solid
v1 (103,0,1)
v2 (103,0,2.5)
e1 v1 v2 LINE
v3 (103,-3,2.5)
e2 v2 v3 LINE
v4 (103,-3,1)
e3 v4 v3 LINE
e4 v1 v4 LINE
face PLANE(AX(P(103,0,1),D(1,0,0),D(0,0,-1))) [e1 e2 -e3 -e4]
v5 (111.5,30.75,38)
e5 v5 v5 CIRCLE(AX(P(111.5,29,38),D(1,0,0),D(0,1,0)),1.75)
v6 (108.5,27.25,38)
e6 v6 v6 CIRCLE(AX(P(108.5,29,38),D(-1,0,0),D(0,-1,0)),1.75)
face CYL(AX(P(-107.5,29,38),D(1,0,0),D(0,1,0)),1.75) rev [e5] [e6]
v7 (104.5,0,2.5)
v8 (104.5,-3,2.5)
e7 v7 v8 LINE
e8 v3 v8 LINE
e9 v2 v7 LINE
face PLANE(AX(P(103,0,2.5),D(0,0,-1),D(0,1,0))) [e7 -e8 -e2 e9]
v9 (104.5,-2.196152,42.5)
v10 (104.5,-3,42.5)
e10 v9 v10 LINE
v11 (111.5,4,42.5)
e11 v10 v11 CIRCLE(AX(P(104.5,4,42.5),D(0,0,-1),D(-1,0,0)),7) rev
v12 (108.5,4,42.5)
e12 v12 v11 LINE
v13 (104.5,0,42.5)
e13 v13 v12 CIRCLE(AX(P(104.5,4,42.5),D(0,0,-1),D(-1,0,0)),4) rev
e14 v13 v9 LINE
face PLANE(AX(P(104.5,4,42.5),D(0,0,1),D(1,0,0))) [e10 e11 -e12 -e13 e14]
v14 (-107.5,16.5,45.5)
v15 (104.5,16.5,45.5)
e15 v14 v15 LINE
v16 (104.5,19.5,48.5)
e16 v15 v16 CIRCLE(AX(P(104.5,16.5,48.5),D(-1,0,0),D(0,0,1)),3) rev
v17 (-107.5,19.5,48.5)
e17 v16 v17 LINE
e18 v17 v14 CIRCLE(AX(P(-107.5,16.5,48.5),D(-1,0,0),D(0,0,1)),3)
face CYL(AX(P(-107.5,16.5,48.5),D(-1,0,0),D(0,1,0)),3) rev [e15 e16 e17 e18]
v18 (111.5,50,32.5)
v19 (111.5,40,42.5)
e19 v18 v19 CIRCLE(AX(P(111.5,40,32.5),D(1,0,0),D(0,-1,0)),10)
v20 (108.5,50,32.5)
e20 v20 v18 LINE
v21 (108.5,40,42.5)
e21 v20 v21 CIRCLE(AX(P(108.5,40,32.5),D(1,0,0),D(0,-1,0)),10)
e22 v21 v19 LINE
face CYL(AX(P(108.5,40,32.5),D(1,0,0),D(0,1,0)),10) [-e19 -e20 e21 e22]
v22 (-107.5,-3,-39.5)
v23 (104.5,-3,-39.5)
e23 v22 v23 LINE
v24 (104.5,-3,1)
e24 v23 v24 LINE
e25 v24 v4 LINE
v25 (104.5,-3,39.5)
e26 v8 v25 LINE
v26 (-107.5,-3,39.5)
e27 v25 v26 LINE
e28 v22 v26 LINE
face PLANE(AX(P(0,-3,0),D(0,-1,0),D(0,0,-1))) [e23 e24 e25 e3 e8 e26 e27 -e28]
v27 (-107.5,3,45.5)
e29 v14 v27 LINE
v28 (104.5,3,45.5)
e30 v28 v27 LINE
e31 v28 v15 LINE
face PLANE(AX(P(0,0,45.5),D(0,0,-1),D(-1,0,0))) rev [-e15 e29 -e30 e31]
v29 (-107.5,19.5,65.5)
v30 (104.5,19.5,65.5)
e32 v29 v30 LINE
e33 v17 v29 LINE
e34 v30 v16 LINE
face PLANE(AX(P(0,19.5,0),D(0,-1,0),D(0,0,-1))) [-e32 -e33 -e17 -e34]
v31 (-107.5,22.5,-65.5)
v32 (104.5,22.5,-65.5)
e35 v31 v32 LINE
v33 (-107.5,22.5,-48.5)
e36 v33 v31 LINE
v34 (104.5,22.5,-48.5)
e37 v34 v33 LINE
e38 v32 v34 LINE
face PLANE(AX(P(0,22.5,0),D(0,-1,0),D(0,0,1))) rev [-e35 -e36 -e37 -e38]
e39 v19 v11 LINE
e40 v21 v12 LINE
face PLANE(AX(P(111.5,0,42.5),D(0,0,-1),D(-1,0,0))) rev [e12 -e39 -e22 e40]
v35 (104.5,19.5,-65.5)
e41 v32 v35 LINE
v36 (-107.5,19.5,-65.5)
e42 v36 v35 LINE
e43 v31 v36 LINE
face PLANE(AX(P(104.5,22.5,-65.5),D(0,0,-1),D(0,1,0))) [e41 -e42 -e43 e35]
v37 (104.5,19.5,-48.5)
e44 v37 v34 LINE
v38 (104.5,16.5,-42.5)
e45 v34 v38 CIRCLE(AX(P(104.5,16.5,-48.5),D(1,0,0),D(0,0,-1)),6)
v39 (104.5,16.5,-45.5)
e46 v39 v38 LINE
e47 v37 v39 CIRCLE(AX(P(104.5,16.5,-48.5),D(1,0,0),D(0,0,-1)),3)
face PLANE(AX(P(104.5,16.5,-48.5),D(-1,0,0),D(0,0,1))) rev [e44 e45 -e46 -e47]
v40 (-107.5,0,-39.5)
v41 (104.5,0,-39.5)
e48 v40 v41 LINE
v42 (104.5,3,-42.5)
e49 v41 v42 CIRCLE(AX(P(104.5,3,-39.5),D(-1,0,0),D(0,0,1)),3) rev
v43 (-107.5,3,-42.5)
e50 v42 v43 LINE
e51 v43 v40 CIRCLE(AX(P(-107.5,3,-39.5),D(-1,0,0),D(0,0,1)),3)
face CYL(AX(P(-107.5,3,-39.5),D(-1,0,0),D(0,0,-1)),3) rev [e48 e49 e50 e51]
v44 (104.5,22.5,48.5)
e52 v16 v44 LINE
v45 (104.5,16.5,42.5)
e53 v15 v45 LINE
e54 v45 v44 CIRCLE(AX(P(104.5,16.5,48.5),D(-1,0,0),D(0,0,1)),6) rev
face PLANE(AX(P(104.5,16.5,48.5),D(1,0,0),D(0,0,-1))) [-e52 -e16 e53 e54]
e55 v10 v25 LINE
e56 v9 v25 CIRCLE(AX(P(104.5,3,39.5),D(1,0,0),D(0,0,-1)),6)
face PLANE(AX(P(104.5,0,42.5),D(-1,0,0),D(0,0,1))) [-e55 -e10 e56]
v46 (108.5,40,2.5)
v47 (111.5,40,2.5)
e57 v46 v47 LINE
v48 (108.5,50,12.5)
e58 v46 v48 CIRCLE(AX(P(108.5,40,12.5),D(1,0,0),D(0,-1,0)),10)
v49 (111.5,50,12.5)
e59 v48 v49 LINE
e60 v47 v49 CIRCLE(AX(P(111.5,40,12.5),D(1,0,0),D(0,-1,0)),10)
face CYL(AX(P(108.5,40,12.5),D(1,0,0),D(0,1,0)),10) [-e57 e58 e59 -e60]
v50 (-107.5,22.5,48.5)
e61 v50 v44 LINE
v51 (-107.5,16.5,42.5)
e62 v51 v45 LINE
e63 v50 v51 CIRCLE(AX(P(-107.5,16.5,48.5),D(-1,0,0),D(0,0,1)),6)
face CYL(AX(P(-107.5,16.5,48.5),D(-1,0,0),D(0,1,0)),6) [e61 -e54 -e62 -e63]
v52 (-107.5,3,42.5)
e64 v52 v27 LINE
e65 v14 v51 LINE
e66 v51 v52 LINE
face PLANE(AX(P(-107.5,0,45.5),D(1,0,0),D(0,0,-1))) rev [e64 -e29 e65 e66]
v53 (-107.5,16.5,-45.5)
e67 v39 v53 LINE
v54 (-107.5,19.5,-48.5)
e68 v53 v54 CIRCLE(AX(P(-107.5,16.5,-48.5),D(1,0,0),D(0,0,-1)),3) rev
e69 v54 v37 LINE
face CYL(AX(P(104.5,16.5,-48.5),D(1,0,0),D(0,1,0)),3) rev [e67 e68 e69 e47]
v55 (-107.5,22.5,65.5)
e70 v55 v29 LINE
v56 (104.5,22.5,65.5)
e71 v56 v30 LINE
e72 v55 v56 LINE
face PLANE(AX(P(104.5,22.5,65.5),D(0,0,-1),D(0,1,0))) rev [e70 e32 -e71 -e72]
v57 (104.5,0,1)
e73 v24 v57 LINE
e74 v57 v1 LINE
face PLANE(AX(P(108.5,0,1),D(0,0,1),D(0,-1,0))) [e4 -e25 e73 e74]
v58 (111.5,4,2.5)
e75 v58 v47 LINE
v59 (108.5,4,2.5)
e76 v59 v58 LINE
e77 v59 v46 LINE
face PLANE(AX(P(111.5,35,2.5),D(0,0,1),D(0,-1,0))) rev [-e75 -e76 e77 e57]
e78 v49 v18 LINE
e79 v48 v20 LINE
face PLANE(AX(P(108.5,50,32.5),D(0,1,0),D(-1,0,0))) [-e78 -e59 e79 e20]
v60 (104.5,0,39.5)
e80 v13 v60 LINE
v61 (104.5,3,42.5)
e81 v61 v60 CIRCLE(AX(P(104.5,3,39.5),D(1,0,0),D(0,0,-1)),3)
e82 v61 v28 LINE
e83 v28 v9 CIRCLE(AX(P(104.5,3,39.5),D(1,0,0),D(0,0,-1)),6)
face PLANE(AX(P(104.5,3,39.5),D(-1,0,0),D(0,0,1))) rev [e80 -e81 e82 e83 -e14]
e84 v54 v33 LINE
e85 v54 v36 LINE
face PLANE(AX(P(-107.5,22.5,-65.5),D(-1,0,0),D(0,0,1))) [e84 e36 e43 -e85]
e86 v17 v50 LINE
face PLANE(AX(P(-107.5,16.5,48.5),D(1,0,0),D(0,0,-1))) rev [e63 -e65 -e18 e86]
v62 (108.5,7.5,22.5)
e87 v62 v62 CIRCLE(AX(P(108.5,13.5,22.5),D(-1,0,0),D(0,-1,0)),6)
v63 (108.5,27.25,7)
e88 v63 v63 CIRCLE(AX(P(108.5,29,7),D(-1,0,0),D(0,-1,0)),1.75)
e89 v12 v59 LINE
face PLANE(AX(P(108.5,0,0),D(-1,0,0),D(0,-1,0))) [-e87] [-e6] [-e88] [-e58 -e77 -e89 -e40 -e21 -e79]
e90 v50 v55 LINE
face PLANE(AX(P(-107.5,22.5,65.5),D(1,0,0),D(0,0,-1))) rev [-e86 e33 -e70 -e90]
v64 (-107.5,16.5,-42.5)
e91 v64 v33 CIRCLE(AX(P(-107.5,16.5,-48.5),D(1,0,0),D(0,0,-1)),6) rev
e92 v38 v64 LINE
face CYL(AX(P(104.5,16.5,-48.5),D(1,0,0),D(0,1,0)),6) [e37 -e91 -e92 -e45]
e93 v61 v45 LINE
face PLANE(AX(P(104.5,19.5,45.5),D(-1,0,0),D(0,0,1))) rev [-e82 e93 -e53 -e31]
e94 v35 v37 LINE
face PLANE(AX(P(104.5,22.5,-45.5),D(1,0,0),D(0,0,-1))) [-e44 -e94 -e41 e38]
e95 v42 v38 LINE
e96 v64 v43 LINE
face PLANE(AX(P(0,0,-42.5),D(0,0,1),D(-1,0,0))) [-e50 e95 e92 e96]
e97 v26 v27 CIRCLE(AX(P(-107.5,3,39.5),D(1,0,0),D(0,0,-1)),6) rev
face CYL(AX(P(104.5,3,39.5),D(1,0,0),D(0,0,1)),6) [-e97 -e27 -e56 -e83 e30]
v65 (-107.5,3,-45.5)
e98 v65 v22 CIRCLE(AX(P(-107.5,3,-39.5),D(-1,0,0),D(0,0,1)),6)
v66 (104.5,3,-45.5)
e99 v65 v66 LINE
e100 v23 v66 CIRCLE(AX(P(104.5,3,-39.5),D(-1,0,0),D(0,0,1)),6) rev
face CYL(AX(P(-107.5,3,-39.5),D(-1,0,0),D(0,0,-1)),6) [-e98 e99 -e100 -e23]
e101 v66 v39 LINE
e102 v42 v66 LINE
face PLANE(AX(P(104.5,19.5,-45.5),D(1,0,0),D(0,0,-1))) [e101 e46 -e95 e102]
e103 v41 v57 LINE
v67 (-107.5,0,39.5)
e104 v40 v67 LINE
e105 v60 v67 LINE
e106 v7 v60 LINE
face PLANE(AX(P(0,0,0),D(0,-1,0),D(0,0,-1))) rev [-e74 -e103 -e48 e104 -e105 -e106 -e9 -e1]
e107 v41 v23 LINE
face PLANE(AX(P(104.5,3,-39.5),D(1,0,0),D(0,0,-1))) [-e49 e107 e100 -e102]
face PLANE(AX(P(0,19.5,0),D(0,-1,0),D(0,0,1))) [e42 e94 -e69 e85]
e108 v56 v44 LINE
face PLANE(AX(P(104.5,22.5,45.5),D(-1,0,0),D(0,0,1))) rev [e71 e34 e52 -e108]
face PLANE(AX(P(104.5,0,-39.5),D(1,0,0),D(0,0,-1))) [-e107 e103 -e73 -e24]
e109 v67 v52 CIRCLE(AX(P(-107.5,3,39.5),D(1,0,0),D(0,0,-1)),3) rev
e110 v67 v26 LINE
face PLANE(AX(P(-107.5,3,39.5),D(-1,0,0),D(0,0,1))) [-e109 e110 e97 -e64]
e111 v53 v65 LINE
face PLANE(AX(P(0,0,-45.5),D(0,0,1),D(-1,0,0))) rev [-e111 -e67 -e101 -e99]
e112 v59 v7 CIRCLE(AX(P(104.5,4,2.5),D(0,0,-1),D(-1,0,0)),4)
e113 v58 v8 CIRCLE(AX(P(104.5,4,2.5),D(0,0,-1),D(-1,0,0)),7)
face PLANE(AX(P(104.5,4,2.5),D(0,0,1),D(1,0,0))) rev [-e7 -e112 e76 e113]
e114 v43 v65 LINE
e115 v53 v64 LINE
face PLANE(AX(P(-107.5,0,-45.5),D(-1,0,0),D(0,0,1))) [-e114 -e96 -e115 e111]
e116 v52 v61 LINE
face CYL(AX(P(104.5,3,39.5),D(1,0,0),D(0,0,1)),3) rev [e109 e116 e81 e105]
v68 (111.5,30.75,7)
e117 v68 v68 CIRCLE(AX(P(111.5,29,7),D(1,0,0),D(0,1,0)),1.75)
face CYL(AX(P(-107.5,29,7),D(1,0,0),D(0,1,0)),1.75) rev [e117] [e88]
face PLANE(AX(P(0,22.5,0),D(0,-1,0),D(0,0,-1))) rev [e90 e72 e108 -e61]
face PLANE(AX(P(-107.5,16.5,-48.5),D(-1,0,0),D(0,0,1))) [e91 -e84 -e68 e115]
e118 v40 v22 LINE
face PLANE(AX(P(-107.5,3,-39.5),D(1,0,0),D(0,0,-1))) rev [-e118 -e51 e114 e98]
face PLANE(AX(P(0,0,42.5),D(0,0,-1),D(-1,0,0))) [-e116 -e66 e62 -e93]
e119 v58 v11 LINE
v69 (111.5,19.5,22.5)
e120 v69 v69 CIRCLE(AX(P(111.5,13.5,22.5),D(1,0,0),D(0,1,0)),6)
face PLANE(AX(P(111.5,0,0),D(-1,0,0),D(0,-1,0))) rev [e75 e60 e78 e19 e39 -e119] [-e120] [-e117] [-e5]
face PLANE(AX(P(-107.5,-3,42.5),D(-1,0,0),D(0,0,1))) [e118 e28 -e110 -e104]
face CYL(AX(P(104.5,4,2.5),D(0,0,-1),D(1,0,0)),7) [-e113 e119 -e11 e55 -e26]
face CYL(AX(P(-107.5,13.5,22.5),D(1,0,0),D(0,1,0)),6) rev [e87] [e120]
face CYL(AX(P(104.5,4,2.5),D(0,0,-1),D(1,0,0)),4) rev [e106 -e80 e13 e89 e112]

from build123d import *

# Parameters (mm, degrees)
BASE_FLANGE1_DEPTH            = 3
EDGE_FLANGE1_STRIP_W          = 20
EDGE_FLANGE1_STRIP_H          = 3
EDGE_FLANGE1_STRIP_CUT_DEPTH  = 40
EDGE_FLANGE1_RELIEF_W         = 21.5
EDGE_FLANGE1_RELIEF_H         = 1.5
EDGE_FLANGE1_RELIEF_CUT_DEPTH = 3
EDGE_FLANGE1_DEPTH            = 40
SKETCH10_R                    = 1.75
SKETCH10_R_2                  = 6
CUT_EXTRUDE1_DEPTH            = 226.814636372
EDGE_FLANGE2_STRIP_W          = 18
EDGE_FLANGE2_STRIP_H          = 3
EDGE_FLANGE2_STRIP_CUT_DEPTH  = 212
EDGE_FLANGE2_DEPTH            = 212
EDGE_FLANGE3_STRIP_W          = 18
EDGE_FLANGE3_STRIP_H          = 3
EDGE_FLANGE3_STRIP_CUT_DEPTH  = 212
EDGE_FLANGE3_DEPTH            = 212
MIRROR1_START                 = -107.5
MIRROR1_DEPTH                 = 213.5
MIRROR1_START_2               = 104.5
MIRROR1_2_DEPTH               = 1.5
MIRROR1_3_DEPTH               = 212
TAB1_DEPTH                    = 3
CUT_EXTRUDE2_DEPTH            = 10


# Read off the part's stored shape, not the designer's step: Mirror1
# Sheet-metal steps are written as plain solids
with BuildPart() as part:
    # Sketch1 → Base-Flange1 (new body)
    with BuildSketch(Plane(origin=(0, 0, 0), x_dir=(1, 0, 0), z_dir=(0, 1, 0))):
        Polygon((-107.5, -42.5), (108.5, -42.5), (108.5, -2.5), (107.5, -2.5), (107.5, 42.5), (-107.5, 42.5), align=None)
    extrude(amount=-BASE_FLANGE1_DEPTH)

    # Edge-Flange1 strip (across the edge) → Edge-Flange1 strip cut (cut)
    with BuildSketch(Plane(origin=(108.5, 0, 42.5), x_dir=(-1, 0, 0), z_dir=(0, 0, -1))):
        with Locations((-6, -1.5)):
            Rectangle(EDGE_FLANGE1_STRIP_W, EDGE_FLANGE1_STRIP_H)
    extrude(amount=EDGE_FLANGE1_STRIP_CUT_DEPTH, mode=Mode.SUBTRACT)

    # Edge-Flange1 relief (on the sheet) → Edge-Flange1 relief cut (cut)
    with BuildSketch(Plane(origin=(104.5, 0, 42.5), x_dir=(-1, 0, 0), z_dir=(0, 1, 0))):
        with Locations((-9.25, -40.75)):
            Rectangle(EDGE_FLANGE1_RELIEF_W, EDGE_FLANGE1_RELIEF_H)
    extrude(amount=-EDGE_FLANGE1_RELIEF_CUT_DEPTH, mode=Mode.SUBTRACT)

    # Edge-Flange1 section (across the edge) → Edge-Flange1 (add)
    with BuildSketch(Plane(origin=(108.5, 0, 42.5), x_dir=(-1, 0, 0), z_dir=(0, 0, -1))):
        with BuildLine():
            Line((-3, 4), (-3, 35))
            Line((-3, 35), (0, 35))
            Line((0, 35), (0, 4))
            ThreePointArc((0, 4), (1.171572875, 1.171572875), (4, 0))
            Line((4, 0), (4, -3))
            ThreePointArc((4, -3), (-0.949747468, -0.949747468), (-3, 4))
        make_face()
    extrude(amount=EDGE_FLANGE1_DEPTH)

    # Sketch10 → Cut-Extrude1 (cut, through all)
    with BuildSketch(Plane(origin=(111.5, 0, 0), x_dir=(0, 0, -1), z_dir=(1, 0, 0))):
        with Locations(Location((-38, 29, 0), (0, 0, 90))):
            Circle(SKETCH10_R)
        with Locations(Location((-7, 29, 0), (0, 0, 90))):
            Circle(SKETCH10_R)
        with Locations(Location((-22.5, 13.5, 0), (0, 0, 90))):
            Circle(SKETCH10_R_2)
    extrude(amount=-CUT_EXTRUDE1_DEPTH, mode=Mode.SUBTRACT)

    # Edge-Flange2 strip (across the edge) → Edge-Flange2 strip cut (cut)
    with BuildSketch(Plane(origin=(-107.5, 0, 42.5), x_dir=(0, 0, -1), z_dir=(1, 0, 0))):
        with Locations((-6, -1.5)):
            Rectangle(EDGE_FLANGE2_STRIP_W, EDGE_FLANGE2_STRIP_H)
    extrude(amount=EDGE_FLANGE2_STRIP_CUT_DEPTH, mode=Mode.SUBTRACT)

    # Edge-Flange2 section (across the edge) → Edge-Flange2 (add)
    with BuildSketch(Plane(origin=(-107.5, 0, 42.5), x_dir=(0, 0, -1), z_dir=(1, 0, 0))):
        with BuildLine():
            Line((-3, 3), (-3, 19.5))
            Line((-3, 19.5), (0, 19.5))
            Line((0, 19.5), (0, 3))
            ThreePointArc((0, 3), (0.878679656, 0.878679656), (3, 0))
            Line((3, 0), (3, -3))
            ThreePointArc((3, -3), (-1.242640687, -1.242640687), (-3, 3))
        make_face()
    extrude(amount=EDGE_FLANGE2_DEPTH)

    # Edge-Flange3 strip (across the edge) → Edge-Flange3 strip cut (cut)
    with BuildSketch(Plane(origin=(104.5, 19.5, 45.5), x_dir=(0, -1, 0), z_dir=(-1, 0, 0))):
        with Locations((-6, -1.5)):
            Rectangle(EDGE_FLANGE3_STRIP_W, EDGE_FLANGE3_STRIP_H)
    extrude(amount=EDGE_FLANGE3_STRIP_CUT_DEPTH, mode=Mode.SUBTRACT)

    # Edge-Flange3 section (across the edge) → Edge-Flange3 (add)
    with BuildSketch(Plane(origin=(104.5, 19.5, 45.5), x_dir=(0, -1, 0), z_dir=(-1, 0, 0))):
        with BuildLine():
            Line((-3, 3), (-3, 20))
            Line((-3, 20), (0, 20))
            Line((0, 20), (0, 3))
            ThreePointArc((0, 3), (0.878679656, 0.878679656), (3, 0))
            Line((3, 0), (3, -3))
            ThreePointArc((3, -3), (-1.242640687, -1.242640687), (-3, 3))
        make_face()
    extrude(amount=EDGE_FLANGE3_DEPTH)

    # Mirror1 outline → Mirror1 (cut)
    with BuildSketch(Plane.YZ.offset(MIRROR1_START)):
        with BuildLine():
            Line((-3, -42.5), (-2.196152423, -42.5))
            ThreePointArc((-2.196152423, -42.5), (-2.795554958, -41.052914271), (-3, -39.5))
            Line((-3, -39.5), (-3, -42.5))
        make_face()
    extrude(amount=MIRROR1_DEPTH, mode=Mode.SUBTRACT)

    # Mirror1 2 outline → Mirror1 2 (cut)
    with BuildSketch(Plane.YZ.offset(MIRROR1_START_2)):
        with BuildLine():
            ThreePointArc((-3, -39.5), (-2.795554958, -41.052914271), (-2.196152423, -42.5))
            Line((-2.196152423, -42.5), (0, -42.5))
            Line((0, -42.5), (0, -38))
            Line((0, -38), (-3, -38))
            Line((-3, -38), (-3, -39.5))
        make_face()
    extrude(amount=MIRROR1_2_DEPTH, mode=Mode.SUBTRACT)

    # Mirror1 3 outline → Mirror1 3 (add)
    with BuildSketch(Plane.YZ.offset(MIRROR1_START)):
        with BuildLine():
            Line((3, -45.5), (16.5, -45.5))
            ThreePointArc((16.5, -45.5), (18.621320344, -46.378679656), (19.5, -48.5))
            Line((19.5, -48.5), (19.5, -65.5))
            Line((19.5, -65.5), (22.5, -65.5))
            Line((22.5, -65.5), (22.5, -48.5))
            ThreePointArc((22.5, -48.5), (20.742640687, -44.257359313), (16.5, -42.5))
            Line((16.5, -42.5), (3, -42.5))
            ThreePointArc((3, -42.5), (0.878679656, -41.621320344), (0, -39.5))
            Line((0, -39.5), (0, -42.5))
            Line((0, -42.5), (-2.196152423, -42.5))
            ThreePointArc((-2.196152423, -42.5), (0, -44.696152423), (3, -45.5))
        make_face()
    extrude(amount=MIRROR1_3_DEPTH)

    # Sketch18 → Tab1 (add)
    with BuildSketch(Plane(origin=(111.5, 0, 0), x_dir=(0, 0, -1), z_dir=(1, 0, 0))):
        with BuildLine():
            Line((-42.5, 35), (-2.5, 35))
            Line((-2.5, 35), (-2.5, 40))
            ThreePointArc((-2.5, 40), (-5.428932188, 47.071067812), (-12.5, 50))
            Line((-12.5, 50), (-32.5, 50))
            ThreePointArc((-32.5, 50), (-39.571067812, 47.071067812), (-42.5, 40))
            Line((-42.5, 40), (-42.5, 35))
        make_face()
    extrude(amount=-TAB1_DEPTH)

    # Sketch19 → Cut-Extrude2 (cut)
    with BuildSketch(Plane(origin=(0, 0, 0), x_dir=(1, 0, 0), z_dir=(0, 1, 0))):
        Polygon((107.5, -1), (107.5, 42.5), (106, 42.5), (104.5, 38), (104.5, -1), align=None)
    extrude(amount=-CUT_EXTRUDE2_DEPTH, mode=Mode.SUBTRACT)


solid = part.part
